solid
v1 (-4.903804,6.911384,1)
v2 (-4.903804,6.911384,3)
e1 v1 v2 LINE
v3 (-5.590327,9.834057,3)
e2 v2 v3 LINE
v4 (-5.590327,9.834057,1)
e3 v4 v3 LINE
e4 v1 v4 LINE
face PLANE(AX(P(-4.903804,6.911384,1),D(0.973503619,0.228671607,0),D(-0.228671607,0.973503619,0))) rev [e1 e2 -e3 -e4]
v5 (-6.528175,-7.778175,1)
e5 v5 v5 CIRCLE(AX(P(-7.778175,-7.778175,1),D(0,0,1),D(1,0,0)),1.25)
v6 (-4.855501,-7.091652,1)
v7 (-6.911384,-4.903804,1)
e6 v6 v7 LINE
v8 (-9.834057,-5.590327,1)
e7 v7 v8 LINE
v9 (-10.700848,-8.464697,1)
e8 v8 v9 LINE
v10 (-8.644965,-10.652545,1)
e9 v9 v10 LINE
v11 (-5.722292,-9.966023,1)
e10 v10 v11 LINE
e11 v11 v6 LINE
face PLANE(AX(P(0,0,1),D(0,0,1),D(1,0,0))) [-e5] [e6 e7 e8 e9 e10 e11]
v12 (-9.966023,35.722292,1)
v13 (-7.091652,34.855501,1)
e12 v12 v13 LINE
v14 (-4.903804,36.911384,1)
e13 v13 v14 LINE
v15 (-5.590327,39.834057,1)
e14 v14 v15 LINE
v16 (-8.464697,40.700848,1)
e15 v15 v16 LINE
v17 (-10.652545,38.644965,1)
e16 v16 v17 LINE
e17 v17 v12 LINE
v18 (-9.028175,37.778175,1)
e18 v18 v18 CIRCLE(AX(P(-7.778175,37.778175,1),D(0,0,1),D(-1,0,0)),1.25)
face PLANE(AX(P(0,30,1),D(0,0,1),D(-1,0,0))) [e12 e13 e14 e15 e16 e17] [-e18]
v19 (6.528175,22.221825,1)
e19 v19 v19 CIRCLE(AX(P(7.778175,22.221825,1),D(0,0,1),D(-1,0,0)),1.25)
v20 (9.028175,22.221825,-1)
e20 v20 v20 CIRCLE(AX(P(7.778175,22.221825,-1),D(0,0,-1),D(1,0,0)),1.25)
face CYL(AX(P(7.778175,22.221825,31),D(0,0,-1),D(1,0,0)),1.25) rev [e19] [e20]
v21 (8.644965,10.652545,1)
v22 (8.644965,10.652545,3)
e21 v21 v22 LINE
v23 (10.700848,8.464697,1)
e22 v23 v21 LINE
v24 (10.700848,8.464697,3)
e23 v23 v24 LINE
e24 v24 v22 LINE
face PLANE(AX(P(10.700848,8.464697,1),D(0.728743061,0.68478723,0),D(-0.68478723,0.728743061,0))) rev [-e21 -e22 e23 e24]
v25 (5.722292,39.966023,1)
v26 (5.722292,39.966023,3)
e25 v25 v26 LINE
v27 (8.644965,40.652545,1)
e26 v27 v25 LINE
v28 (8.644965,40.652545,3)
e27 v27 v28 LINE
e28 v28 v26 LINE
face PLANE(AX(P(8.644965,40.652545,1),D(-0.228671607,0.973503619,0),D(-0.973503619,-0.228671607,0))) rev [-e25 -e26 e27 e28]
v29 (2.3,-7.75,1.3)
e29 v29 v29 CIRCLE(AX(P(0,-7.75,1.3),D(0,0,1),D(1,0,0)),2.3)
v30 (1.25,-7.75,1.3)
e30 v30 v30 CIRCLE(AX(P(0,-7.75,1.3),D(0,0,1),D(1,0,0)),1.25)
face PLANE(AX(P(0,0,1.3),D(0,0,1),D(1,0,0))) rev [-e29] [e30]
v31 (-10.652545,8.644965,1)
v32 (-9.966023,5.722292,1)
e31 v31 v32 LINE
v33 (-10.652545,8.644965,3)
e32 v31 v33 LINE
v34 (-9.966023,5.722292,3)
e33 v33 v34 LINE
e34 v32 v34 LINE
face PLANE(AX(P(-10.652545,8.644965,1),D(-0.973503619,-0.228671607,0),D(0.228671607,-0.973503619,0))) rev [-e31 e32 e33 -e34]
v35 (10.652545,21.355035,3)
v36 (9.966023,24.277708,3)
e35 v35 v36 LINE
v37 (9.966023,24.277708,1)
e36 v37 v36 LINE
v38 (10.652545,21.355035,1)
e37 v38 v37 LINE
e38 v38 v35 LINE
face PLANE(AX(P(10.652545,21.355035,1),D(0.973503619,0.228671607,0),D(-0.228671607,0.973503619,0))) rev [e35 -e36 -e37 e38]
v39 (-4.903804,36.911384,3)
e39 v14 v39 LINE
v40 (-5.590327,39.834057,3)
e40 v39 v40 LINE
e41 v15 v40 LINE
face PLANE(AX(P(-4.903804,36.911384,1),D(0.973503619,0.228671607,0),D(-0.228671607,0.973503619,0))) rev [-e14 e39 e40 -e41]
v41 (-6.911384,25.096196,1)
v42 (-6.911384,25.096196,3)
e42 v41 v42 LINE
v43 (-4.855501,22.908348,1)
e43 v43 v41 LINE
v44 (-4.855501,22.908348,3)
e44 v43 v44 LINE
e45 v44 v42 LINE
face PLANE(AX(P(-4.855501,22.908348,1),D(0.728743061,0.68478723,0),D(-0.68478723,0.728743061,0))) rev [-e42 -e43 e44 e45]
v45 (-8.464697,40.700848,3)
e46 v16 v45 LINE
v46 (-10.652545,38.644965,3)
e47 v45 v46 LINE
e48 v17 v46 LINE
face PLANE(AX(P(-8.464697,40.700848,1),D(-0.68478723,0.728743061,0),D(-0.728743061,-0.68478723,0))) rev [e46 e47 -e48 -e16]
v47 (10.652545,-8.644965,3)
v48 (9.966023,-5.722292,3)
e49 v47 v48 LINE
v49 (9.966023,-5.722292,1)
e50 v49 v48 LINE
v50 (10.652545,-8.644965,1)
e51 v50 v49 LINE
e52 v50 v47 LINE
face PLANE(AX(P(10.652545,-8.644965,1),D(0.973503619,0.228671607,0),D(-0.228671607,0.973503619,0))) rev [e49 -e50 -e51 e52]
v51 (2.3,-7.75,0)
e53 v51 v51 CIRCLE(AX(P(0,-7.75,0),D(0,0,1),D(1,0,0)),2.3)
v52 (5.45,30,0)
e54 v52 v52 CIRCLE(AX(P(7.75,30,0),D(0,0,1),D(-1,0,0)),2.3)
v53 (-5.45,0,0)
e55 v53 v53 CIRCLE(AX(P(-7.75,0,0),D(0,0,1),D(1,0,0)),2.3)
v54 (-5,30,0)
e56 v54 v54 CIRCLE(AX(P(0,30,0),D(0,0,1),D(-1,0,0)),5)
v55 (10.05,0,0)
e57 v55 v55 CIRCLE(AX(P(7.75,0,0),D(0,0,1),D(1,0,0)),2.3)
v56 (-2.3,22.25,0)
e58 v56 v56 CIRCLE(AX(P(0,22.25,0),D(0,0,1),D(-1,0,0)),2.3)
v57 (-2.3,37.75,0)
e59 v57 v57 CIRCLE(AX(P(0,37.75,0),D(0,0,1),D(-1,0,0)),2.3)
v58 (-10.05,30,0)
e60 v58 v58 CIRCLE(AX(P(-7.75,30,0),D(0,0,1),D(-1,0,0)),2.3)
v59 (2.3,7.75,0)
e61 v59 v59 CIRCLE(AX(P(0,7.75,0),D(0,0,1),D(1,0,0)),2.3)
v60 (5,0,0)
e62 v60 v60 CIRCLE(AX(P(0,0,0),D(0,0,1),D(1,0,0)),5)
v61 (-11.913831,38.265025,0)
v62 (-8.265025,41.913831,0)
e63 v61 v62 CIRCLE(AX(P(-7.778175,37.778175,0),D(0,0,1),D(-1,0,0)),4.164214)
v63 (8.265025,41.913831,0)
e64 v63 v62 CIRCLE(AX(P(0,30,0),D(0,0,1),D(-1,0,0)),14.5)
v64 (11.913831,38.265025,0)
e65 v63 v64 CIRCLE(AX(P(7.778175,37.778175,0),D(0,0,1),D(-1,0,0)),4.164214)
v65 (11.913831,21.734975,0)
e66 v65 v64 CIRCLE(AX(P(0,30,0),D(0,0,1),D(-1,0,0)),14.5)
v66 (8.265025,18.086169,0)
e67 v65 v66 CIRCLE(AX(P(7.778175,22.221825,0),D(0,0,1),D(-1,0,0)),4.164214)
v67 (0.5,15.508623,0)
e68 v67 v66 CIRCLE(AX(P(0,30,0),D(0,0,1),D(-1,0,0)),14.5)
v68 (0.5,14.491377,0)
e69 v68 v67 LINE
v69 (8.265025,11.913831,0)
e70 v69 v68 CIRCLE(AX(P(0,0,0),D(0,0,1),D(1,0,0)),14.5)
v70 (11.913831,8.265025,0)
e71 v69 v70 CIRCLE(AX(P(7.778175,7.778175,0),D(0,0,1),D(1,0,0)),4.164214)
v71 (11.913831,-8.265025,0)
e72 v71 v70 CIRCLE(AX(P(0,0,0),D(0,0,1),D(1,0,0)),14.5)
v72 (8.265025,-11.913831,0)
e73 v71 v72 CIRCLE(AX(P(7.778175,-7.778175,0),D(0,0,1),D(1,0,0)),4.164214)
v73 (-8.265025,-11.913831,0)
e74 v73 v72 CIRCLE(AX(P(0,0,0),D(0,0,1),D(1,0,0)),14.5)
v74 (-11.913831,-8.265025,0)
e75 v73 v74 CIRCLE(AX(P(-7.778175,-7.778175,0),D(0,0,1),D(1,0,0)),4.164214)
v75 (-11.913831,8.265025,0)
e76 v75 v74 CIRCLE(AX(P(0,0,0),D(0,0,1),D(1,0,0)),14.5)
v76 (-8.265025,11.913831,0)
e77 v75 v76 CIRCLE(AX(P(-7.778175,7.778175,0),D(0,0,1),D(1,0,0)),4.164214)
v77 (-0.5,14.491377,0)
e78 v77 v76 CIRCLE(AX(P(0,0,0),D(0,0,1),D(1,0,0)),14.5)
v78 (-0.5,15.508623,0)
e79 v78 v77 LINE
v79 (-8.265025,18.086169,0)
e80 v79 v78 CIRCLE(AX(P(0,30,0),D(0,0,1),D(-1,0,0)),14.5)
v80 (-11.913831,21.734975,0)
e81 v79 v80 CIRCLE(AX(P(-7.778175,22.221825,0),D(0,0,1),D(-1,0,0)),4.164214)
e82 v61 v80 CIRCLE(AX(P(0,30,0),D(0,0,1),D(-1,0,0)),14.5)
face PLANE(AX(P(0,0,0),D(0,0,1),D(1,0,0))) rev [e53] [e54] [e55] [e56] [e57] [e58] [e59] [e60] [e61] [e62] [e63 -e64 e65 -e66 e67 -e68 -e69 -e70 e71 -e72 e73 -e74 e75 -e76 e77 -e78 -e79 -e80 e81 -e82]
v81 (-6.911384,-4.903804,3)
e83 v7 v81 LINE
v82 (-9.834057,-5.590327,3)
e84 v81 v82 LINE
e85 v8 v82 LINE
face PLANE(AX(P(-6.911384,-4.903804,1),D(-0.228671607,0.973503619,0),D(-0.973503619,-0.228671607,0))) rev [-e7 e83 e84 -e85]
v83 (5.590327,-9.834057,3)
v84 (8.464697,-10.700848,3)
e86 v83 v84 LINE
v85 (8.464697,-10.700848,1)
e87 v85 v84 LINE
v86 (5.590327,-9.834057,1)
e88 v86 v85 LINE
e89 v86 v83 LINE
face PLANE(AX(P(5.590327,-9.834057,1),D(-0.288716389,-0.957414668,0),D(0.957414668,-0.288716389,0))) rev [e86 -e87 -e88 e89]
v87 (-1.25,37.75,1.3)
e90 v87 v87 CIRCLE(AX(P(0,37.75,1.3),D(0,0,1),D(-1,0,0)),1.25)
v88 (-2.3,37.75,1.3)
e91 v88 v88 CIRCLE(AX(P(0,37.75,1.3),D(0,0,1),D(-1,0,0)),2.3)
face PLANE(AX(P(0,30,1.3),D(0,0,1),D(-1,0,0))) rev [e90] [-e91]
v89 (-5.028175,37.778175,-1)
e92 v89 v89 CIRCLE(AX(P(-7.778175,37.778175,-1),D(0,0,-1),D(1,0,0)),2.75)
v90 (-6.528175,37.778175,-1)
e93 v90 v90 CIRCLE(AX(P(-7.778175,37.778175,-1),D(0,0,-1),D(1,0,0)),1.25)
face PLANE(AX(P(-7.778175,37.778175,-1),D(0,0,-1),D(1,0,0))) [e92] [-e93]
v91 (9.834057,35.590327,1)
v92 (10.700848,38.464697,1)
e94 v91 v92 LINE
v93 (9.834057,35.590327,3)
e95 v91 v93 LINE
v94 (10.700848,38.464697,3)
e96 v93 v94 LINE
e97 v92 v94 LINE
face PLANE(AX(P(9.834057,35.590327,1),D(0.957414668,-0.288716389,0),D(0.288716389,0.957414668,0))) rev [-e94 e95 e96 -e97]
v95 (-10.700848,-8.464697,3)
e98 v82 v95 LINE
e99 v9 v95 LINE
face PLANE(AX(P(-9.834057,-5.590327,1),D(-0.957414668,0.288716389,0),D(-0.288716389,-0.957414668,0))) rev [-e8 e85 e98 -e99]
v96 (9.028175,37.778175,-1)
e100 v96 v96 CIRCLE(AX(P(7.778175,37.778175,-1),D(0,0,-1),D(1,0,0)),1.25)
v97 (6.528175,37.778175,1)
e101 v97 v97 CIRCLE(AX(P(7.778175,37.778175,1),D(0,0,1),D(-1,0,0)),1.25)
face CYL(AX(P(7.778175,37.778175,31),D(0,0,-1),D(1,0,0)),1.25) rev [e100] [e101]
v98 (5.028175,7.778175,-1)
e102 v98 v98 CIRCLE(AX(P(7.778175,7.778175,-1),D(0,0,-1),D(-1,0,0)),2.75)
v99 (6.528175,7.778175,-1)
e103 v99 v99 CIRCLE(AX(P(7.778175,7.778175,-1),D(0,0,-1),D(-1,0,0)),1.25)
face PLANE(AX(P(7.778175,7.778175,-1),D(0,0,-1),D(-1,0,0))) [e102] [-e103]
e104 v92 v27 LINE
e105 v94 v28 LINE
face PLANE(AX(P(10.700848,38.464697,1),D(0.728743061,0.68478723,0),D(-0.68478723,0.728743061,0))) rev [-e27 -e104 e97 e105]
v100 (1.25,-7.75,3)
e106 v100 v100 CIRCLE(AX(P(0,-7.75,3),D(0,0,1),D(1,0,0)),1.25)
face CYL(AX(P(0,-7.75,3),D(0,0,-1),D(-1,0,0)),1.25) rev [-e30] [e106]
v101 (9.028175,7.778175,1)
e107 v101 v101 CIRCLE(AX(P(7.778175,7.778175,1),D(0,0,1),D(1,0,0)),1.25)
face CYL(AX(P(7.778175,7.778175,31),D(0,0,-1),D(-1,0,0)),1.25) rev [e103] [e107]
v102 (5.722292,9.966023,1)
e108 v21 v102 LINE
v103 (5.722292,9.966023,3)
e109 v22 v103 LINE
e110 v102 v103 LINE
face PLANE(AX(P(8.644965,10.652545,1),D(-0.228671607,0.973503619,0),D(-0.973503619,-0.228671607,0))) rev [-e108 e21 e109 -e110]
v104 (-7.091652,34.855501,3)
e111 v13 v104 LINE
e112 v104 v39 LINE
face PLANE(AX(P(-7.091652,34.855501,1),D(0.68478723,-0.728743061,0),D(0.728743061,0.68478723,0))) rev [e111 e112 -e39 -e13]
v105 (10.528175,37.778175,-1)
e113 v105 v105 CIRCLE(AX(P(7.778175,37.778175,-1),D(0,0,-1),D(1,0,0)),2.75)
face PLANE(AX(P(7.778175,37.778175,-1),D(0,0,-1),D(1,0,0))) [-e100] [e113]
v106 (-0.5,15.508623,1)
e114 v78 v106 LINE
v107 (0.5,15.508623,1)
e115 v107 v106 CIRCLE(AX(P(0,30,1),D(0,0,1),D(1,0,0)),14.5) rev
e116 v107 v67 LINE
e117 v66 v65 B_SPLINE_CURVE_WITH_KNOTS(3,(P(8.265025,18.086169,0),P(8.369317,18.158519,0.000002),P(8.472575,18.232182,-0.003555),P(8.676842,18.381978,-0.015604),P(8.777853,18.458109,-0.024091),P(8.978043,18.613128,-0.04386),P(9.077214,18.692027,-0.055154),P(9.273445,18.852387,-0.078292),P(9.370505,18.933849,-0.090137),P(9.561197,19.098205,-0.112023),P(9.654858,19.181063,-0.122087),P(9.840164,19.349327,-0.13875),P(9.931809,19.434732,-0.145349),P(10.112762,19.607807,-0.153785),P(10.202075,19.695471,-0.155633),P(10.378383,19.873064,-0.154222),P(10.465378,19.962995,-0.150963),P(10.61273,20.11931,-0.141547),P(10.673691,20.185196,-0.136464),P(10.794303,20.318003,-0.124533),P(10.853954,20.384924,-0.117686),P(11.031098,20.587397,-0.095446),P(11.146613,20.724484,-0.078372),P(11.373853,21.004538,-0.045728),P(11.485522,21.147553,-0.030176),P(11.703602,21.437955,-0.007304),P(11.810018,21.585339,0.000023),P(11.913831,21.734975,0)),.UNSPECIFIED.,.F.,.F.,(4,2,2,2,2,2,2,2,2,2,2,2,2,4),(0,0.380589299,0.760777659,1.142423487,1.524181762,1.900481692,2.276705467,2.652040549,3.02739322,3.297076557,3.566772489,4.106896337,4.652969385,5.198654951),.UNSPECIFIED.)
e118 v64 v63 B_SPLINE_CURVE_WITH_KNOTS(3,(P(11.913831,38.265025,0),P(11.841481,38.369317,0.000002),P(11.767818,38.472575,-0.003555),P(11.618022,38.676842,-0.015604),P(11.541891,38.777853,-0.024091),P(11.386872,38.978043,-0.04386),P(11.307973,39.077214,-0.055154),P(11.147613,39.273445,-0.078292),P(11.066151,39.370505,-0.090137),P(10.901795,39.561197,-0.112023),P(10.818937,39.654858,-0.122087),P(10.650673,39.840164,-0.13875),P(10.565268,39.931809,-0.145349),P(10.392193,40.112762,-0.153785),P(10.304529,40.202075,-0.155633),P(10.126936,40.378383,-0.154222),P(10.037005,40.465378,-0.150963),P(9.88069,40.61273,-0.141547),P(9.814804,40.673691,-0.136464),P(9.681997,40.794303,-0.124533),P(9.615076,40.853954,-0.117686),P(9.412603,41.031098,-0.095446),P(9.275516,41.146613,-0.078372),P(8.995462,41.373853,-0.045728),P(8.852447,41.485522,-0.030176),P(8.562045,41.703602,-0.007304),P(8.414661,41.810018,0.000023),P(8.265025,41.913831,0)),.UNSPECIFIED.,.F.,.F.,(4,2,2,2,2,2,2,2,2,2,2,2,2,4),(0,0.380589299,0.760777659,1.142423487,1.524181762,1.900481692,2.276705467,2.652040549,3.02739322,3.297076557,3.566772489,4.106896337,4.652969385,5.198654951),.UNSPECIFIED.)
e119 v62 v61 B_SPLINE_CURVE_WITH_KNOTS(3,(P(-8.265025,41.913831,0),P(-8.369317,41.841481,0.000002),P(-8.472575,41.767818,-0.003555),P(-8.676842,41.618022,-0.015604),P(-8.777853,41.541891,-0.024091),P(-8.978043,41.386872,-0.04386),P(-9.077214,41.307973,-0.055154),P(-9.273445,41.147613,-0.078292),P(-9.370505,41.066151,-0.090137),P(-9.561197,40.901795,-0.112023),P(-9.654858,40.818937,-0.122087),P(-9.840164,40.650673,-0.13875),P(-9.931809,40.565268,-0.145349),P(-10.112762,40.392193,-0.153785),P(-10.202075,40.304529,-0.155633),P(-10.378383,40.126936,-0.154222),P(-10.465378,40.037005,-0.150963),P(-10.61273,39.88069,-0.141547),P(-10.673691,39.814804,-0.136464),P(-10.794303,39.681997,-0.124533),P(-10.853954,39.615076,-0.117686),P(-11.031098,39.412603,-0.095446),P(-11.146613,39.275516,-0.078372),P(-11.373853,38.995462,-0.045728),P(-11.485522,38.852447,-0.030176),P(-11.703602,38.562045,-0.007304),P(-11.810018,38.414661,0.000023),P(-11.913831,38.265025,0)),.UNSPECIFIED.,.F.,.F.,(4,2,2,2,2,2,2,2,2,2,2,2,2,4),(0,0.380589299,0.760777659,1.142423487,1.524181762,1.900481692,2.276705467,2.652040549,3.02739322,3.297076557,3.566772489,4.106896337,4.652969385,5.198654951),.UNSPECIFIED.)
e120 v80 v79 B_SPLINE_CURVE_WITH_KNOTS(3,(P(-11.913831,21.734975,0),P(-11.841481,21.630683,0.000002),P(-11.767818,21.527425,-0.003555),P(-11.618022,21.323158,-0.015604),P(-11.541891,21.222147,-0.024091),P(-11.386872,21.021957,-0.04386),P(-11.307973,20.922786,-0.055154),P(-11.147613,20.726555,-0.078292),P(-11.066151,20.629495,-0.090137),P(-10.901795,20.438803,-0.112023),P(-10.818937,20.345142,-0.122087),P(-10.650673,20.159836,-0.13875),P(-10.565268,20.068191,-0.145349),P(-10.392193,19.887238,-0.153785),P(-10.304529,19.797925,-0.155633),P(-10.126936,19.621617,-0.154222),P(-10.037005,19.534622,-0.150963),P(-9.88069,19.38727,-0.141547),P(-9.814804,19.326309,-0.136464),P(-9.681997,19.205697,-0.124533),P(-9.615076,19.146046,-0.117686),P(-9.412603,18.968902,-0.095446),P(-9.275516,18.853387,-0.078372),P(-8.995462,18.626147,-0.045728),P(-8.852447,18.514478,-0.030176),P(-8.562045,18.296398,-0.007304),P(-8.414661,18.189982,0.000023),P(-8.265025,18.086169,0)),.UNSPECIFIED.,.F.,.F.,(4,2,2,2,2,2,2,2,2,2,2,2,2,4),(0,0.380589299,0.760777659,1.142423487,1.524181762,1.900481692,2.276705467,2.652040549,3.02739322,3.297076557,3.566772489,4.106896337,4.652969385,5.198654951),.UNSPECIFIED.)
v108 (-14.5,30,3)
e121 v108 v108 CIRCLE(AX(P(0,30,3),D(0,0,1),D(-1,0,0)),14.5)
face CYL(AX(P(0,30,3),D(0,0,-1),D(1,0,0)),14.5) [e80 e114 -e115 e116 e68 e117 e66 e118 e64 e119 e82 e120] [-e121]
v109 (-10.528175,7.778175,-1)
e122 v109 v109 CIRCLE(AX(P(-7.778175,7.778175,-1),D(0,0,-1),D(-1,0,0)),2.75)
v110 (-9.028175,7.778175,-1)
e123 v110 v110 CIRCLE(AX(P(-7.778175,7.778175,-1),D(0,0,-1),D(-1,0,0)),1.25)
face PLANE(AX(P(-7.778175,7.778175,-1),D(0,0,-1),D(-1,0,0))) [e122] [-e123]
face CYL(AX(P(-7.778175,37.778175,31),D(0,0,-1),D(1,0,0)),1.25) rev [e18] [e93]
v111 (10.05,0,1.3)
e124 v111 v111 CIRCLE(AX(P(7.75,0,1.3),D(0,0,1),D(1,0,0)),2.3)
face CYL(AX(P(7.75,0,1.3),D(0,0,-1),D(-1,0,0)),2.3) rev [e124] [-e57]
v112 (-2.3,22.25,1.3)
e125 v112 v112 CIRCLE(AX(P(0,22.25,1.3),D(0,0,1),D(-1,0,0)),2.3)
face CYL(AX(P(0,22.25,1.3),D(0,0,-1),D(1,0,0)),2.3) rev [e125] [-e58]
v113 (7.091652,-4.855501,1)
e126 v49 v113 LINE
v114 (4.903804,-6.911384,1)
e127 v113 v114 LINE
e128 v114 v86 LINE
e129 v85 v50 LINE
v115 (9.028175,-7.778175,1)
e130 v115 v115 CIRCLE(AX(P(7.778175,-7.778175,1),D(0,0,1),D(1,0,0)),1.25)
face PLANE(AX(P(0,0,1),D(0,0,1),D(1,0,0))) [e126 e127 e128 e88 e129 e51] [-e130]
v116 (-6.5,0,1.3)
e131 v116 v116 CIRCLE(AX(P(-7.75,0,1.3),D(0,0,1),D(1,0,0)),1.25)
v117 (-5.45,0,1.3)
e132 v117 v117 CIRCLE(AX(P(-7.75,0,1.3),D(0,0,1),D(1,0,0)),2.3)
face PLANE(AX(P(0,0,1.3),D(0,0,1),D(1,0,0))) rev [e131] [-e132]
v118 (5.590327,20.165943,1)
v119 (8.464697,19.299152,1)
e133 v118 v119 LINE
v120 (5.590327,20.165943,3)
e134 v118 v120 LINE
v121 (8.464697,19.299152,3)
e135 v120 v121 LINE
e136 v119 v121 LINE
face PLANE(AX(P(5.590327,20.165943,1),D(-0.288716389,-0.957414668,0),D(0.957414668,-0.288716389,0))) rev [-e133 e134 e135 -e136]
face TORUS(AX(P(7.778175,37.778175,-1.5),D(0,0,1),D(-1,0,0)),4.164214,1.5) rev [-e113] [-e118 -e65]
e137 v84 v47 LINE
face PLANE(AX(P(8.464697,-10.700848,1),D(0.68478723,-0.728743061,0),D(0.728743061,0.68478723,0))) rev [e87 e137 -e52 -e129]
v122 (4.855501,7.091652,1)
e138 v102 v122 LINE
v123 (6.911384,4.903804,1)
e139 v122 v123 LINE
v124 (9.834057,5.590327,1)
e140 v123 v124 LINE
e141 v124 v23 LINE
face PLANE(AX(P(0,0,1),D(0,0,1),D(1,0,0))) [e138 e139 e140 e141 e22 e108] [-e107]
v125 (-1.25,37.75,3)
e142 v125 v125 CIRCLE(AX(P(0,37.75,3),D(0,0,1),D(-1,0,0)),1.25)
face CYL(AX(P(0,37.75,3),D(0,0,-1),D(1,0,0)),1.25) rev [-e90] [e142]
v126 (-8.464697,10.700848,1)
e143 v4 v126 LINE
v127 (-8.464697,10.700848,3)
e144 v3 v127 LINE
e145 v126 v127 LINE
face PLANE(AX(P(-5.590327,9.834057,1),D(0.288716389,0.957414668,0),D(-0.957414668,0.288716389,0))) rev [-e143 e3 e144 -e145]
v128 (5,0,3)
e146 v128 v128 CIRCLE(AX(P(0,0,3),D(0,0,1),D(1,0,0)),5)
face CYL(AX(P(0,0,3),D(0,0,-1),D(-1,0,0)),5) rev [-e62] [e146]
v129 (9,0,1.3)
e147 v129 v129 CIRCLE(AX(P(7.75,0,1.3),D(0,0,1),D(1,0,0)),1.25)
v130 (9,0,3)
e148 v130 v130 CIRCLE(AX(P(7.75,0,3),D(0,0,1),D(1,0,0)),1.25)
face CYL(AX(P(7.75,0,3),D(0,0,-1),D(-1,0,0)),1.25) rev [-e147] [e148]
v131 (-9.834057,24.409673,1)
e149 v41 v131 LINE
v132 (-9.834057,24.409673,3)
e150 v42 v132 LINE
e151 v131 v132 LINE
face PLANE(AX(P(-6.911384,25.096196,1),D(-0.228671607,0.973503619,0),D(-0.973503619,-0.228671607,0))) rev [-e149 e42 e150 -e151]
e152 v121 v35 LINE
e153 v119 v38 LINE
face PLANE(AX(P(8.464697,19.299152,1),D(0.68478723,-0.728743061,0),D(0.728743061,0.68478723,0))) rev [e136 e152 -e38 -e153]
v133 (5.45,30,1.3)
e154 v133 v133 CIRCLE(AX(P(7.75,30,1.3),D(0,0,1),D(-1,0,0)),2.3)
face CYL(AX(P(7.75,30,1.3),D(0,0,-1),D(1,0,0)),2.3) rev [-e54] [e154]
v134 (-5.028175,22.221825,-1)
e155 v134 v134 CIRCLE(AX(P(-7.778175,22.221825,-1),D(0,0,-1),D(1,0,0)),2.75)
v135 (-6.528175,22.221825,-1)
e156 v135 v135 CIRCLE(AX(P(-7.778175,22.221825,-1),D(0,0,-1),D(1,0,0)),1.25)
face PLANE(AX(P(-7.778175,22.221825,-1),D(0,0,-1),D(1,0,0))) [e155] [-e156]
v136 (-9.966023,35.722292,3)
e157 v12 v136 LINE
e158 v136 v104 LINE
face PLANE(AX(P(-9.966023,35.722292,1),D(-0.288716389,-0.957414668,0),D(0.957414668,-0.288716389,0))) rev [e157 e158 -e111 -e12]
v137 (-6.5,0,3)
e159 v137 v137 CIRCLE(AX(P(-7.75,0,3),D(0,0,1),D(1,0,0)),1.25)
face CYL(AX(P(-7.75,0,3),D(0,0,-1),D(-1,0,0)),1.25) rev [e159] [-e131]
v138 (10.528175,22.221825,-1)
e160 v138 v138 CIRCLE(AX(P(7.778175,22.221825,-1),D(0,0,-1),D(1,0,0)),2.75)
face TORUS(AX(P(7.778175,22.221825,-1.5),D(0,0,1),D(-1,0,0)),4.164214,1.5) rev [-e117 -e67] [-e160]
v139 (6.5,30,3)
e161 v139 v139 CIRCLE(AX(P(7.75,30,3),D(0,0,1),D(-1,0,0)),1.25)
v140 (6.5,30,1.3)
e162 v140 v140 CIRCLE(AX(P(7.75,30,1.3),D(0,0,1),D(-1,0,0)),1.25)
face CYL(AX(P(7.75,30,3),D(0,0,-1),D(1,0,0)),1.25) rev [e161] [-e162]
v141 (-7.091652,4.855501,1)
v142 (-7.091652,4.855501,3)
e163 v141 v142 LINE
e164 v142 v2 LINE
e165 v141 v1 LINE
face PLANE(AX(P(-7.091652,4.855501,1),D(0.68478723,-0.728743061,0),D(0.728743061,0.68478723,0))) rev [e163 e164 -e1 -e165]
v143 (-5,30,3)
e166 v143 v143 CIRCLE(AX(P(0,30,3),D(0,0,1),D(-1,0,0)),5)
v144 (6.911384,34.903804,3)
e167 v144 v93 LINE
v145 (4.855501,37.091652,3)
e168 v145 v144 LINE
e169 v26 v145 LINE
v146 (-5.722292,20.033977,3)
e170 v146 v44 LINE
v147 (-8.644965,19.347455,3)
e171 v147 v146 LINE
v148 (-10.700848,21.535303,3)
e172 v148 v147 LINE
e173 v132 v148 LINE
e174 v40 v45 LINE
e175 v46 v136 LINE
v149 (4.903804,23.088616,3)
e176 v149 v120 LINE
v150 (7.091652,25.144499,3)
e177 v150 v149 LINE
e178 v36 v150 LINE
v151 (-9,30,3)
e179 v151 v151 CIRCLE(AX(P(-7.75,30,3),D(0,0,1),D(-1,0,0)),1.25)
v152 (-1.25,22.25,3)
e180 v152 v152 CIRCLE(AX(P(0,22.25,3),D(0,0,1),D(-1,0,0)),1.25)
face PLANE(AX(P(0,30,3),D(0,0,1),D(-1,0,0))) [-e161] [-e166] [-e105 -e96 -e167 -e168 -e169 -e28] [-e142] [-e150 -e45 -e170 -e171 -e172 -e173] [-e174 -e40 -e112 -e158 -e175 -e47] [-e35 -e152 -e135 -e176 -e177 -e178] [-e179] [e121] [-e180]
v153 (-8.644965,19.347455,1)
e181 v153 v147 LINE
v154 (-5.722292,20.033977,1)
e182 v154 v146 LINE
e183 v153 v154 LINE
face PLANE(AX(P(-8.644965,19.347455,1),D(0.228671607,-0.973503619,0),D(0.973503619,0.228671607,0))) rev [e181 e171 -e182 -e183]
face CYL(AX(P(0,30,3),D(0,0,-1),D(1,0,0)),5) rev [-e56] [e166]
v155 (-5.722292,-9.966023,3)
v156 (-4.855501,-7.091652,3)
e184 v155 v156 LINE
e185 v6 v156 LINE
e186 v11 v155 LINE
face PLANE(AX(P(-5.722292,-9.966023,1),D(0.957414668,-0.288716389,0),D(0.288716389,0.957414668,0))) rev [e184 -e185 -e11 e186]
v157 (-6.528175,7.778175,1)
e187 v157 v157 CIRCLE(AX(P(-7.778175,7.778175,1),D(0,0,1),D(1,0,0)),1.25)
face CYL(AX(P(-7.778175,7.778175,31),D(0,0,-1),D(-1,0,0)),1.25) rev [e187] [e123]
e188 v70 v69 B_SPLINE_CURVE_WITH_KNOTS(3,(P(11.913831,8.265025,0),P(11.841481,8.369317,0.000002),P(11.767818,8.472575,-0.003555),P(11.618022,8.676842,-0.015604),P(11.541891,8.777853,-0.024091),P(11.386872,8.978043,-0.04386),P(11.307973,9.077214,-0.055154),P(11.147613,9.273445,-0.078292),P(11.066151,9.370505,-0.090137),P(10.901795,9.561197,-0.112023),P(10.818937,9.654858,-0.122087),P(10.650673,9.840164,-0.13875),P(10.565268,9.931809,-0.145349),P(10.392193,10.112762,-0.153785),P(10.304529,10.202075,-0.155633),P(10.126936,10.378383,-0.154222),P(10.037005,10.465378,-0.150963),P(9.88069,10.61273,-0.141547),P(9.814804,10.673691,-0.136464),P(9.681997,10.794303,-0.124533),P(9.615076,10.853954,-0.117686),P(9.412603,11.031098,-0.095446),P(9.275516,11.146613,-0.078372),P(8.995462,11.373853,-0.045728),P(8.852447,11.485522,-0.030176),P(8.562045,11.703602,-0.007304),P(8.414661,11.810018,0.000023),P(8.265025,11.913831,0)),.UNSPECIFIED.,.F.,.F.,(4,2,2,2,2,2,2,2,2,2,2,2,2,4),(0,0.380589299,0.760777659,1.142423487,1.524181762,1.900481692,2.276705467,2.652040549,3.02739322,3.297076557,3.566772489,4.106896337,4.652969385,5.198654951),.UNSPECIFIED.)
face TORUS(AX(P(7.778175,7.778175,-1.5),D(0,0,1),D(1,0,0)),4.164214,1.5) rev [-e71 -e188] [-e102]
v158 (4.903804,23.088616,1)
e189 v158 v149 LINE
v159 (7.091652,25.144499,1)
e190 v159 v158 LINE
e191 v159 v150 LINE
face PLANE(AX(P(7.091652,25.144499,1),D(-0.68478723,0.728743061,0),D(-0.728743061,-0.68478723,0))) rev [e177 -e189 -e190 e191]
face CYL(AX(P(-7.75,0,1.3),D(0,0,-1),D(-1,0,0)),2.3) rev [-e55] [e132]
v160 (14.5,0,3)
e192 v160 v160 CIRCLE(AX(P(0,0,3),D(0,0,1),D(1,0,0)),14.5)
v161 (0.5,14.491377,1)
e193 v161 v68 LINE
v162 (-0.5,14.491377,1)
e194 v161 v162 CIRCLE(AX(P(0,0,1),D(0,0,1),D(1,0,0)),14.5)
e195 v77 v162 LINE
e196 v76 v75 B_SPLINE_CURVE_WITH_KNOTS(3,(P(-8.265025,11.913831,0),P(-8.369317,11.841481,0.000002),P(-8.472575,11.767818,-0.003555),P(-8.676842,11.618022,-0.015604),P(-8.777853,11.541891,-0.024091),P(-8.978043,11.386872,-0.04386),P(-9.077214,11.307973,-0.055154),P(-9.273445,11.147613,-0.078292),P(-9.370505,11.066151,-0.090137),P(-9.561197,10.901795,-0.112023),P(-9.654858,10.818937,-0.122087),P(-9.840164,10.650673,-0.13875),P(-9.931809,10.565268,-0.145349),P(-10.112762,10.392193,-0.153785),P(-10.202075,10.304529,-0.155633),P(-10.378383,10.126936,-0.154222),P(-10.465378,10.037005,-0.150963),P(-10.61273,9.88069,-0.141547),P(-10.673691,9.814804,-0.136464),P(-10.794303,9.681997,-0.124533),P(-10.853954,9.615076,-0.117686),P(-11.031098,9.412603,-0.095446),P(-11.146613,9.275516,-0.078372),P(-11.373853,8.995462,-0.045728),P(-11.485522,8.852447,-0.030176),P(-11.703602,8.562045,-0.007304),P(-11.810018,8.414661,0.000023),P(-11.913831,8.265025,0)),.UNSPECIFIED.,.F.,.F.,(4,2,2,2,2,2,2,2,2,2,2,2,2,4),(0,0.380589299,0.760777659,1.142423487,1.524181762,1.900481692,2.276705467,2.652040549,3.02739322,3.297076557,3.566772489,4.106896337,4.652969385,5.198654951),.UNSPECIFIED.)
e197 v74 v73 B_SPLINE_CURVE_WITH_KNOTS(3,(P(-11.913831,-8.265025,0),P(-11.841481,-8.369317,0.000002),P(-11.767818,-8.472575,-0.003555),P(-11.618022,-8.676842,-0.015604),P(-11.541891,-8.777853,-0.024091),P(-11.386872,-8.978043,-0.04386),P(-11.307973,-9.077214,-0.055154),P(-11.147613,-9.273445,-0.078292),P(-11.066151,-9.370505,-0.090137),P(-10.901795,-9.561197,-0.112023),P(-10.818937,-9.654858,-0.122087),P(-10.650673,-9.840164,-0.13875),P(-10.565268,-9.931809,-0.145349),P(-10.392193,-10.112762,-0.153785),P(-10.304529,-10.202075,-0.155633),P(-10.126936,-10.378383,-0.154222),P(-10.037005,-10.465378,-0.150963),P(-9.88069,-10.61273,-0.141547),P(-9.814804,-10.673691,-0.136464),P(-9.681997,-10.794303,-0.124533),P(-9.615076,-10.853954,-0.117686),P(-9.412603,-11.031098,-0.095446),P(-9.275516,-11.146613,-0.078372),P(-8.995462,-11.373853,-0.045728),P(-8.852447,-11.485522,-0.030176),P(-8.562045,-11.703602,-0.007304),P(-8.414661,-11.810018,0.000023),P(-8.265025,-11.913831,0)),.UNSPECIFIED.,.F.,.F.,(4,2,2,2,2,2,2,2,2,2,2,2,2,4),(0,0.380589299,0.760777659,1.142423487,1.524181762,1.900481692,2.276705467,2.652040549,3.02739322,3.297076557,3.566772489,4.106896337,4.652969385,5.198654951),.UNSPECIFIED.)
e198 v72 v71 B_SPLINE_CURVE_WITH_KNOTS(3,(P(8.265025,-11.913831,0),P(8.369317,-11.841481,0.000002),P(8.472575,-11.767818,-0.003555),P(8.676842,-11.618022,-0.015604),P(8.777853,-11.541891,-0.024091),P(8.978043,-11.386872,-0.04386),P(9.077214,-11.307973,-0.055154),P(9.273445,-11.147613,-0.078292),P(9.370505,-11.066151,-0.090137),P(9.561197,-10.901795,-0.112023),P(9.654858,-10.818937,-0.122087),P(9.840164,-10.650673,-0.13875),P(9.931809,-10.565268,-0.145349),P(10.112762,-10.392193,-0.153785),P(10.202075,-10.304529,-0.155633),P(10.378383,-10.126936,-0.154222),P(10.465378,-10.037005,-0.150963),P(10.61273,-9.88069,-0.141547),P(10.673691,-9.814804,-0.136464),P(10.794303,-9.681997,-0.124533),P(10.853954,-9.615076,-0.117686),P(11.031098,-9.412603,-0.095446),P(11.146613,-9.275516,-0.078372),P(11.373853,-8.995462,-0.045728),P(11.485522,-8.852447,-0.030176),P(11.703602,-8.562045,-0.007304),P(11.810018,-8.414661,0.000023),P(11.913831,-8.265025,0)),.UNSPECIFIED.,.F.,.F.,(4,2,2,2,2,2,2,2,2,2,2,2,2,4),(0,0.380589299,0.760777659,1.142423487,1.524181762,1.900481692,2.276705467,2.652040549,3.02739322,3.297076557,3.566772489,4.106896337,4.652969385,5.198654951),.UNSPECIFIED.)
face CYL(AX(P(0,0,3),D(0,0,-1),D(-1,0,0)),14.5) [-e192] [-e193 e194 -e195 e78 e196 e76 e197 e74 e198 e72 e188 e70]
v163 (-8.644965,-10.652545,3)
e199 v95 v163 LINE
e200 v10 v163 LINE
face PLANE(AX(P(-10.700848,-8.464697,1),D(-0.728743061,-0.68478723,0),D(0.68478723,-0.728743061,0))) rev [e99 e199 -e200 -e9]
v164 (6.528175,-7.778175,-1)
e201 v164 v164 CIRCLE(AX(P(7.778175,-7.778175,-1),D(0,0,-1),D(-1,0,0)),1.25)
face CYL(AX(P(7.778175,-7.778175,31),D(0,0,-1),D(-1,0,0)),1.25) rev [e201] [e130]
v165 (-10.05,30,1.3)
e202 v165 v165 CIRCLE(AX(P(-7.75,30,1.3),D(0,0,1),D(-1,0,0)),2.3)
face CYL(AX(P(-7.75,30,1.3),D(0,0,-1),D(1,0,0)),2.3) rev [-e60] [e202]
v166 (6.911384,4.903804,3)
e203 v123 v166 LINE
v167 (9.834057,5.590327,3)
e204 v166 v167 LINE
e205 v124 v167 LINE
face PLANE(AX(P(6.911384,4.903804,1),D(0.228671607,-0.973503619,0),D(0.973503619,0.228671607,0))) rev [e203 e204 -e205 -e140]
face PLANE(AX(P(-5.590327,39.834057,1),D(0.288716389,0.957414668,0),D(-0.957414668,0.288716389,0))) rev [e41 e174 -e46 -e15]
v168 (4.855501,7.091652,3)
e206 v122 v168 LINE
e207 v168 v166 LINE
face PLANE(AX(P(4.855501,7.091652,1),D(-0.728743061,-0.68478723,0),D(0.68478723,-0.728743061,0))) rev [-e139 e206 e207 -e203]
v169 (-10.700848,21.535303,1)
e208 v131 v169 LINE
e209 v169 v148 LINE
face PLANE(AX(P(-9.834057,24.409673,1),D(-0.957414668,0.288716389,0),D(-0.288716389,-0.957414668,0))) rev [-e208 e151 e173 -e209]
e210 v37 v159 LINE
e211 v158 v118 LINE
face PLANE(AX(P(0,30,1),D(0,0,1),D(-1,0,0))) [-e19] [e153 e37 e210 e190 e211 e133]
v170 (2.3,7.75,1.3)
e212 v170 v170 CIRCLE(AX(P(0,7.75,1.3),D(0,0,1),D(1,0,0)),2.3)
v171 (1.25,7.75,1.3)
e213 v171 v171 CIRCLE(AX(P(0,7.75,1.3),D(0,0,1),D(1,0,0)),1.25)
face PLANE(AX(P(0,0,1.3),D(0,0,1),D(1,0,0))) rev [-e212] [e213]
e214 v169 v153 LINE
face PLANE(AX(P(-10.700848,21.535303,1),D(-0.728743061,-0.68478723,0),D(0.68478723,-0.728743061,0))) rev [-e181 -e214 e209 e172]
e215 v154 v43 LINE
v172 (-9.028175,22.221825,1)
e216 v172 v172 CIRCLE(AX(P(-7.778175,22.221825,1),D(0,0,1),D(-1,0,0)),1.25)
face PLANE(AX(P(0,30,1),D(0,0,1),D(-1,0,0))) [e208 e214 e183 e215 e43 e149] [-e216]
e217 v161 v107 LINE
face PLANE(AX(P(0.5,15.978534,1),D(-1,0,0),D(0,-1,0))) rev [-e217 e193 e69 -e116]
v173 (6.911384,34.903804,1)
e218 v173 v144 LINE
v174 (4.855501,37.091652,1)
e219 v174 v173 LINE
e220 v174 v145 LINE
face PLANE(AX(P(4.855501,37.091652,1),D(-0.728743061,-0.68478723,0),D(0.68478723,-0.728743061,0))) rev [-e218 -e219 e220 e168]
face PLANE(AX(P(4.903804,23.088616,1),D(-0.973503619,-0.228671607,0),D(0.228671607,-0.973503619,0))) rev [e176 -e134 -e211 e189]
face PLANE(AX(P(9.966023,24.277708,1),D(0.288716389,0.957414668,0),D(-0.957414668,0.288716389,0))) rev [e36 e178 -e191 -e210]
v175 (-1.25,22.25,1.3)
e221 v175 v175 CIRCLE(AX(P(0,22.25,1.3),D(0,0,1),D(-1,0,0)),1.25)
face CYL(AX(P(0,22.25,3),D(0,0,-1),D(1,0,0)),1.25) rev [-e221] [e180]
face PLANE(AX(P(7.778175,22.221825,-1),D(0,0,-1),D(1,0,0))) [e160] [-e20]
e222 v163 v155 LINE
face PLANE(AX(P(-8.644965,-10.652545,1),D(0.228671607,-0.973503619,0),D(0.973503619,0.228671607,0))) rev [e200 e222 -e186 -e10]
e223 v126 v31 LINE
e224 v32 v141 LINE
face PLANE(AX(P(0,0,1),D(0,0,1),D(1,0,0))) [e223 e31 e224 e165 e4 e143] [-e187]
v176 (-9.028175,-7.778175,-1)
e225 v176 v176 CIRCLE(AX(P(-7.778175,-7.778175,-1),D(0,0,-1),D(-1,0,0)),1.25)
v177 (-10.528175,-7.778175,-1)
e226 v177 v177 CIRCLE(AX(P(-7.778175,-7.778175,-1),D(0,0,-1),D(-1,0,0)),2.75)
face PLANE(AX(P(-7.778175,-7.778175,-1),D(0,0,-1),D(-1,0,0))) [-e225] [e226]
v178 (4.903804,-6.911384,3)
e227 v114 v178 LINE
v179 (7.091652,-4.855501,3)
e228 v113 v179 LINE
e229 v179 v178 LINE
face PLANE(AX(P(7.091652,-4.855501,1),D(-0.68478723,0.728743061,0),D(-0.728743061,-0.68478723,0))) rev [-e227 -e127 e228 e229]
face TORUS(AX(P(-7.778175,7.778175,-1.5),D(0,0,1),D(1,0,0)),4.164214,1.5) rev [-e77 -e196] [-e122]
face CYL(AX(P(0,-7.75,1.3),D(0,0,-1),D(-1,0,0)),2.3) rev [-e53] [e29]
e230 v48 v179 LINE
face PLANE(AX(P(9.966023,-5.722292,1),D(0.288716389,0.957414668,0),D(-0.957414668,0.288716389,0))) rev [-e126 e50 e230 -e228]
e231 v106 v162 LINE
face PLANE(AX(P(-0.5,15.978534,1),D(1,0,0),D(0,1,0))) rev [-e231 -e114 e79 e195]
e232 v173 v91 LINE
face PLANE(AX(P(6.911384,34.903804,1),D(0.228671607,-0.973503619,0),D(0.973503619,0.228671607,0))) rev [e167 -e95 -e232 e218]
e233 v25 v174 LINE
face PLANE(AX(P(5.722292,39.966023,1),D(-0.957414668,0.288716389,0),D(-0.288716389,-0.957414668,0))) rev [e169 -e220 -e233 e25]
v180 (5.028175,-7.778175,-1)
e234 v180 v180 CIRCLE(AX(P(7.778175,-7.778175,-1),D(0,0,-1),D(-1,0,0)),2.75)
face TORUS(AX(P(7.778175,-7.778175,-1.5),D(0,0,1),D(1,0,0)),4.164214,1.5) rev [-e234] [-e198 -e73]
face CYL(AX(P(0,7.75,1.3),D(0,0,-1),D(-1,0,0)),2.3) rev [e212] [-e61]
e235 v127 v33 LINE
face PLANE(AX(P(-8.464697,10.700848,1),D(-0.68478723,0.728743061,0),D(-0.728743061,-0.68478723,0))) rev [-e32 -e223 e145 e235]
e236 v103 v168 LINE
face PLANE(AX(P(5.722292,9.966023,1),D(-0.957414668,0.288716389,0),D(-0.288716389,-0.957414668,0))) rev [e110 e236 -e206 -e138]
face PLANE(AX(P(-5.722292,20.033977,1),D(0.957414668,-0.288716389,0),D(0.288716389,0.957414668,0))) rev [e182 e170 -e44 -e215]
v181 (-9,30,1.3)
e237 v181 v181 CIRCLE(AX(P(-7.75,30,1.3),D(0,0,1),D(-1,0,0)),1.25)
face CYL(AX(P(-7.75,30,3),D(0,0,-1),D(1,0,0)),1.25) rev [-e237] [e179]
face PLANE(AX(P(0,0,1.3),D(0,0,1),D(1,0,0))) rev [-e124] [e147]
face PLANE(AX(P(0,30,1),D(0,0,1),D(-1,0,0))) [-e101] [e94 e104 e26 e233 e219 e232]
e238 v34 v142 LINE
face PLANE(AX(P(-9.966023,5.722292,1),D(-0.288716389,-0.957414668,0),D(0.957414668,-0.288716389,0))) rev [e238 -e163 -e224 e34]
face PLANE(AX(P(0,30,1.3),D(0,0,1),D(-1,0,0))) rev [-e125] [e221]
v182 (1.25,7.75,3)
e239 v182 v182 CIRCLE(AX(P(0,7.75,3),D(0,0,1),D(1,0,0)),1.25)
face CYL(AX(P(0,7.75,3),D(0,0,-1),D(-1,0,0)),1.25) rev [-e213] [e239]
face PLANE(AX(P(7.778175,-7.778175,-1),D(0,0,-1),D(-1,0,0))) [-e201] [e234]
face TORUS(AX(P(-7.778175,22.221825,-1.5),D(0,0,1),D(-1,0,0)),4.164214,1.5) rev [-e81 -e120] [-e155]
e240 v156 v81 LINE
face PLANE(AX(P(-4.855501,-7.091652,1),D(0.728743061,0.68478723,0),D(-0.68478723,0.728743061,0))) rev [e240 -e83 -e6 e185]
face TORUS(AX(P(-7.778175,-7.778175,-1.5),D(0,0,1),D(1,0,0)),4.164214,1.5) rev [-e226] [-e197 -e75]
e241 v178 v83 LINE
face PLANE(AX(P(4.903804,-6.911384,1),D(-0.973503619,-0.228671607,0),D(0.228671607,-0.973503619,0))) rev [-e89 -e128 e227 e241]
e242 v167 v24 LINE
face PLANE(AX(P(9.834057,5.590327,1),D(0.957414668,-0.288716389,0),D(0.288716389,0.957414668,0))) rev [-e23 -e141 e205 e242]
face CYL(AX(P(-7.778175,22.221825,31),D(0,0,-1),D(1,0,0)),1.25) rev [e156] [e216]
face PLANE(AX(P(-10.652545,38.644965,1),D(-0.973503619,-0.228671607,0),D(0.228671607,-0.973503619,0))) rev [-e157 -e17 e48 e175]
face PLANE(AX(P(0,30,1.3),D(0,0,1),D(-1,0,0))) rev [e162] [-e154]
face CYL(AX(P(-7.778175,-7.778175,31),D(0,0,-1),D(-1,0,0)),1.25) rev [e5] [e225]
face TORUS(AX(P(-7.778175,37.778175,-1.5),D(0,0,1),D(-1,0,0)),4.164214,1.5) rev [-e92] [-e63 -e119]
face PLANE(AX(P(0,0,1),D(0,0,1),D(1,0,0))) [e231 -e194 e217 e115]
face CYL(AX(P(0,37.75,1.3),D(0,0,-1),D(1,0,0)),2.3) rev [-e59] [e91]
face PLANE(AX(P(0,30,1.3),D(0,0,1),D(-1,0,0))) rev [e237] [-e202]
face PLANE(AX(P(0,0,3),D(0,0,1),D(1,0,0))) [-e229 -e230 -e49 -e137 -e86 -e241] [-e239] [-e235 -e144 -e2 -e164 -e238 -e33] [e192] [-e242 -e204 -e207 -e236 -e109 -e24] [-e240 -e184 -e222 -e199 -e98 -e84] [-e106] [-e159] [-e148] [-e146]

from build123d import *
from build123d.topology import SkipClean

# Parameters (mm, degrees)
SKETCH_1_R               = 14.5
SKETCH_1_R_2             = 1.25
SKETCH_1_R_3             = 5
EXTRUDE_5_DEPTH          = 3
SKETCH_1_6_R             = 5
SKETCH_1_6_R_2           = 2.3
SKETCH_1_6_R_3           = 1.25
CUT_EXTRUDE_1_DEPTH      = 1.3
SKETCH_2_R               = 1.25
CUT_EXTRUDE_2_DEPTH      = 31
EXTRUDE_START            = 1
SKETCH_3_R               = 2.75
SKETCH_3_R_2             = 1.25
EXTRUDE_6_DEPTH          = 1
FILLET_1_R               = 1.5
CUT_EXTRUDE_3_DEPTH      = 2
PATTERN_CIRCULAR_2_COUNT = 2
SKETCH_7_W               = 1
SKETCH_7_H               = 1.957068822
EXTRUDE_7_DEPTH          = 1


with BuildPart() as part:
    # 草图1 → 凸台-拉伸5 (new body)
    with BuildSketch(Plane.XY):
        Circle(SKETCH_1_R)
        with Locations((0, 7.75)):
            Circle(SKETCH_1_R_2, mode=Mode.SUBTRACT)
        with Locations((7.75, 0)):
            Circle(SKETCH_1_R_2, mode=Mode.SUBTRACT)
        with Locations((0, -7.75)):
            Circle(SKETCH_1_R_2, mode=Mode.SUBTRACT)
        with Locations((-7.75, 0)):
            Circle(SKETCH_1_R_2, mode=Mode.SUBTRACT)
        Circle(SKETCH_1_R_3, mode=Mode.SUBTRACT)
    extrude(amount=EXTRUDE_5_DEPTH)

    # 草图1<6> → 切除-拉伸1 (cut)
    # profile 1 of 8: a face of its own
    with BuildSketch(Plane.XY):
        Circle(SKETCH_1_6_R)
    # profile 2 of 8: a face of its own
    with BuildSketch(Plane.XY):
        with Locations((7.75, 0)):
            Circle(SKETCH_1_6_R_2)
        with Locations((7.75, 0)):
            Circle(SKETCH_1_6_R_3, mode=Mode.SUBTRACT)
    # profile 3 of 8: a face of its own
    with BuildSketch(Plane.XY):
        Circle(SKETCH_1_6_R)
    # profile 4 of 8: a face of its own
    with BuildSketch(Plane.XY):
        with Locations((0, 7.75)):
            Circle(SKETCH_1_6_R_2)
        with Locations((0, 7.75)):
            Circle(SKETCH_1_6_R_3, mode=Mode.SUBTRACT)
    # profile 5 of 8: a face of its own
    with BuildSketch(Plane.XY):
        Circle(SKETCH_1_6_R)
    # profile 6 of 8: a face of its own
    with BuildSketch(Plane.XY):
        with Locations((-7.75, 0)):
            Circle(SKETCH_1_6_R_2)
        with Locations((-7.75, 0)):
            Circle(SKETCH_1_6_R_3, mode=Mode.SUBTRACT)
    # profile 7 of 8: a face of its own
    with BuildSketch(Plane.XY):
        Circle(SKETCH_1_6_R)
    # profile 8 of 8: a face of its own
    with BuildSketch(Plane.XY):
        with Locations((0, -7.75)):
            Circle(SKETCH_1_6_R_2)
        with Locations((0, -7.75)):
            Circle(SKETCH_1_6_R_3, mode=Mode.SUBTRACT)
    extrude(amount=CUT_EXTRUDE_1_DEPTH, mode=Mode.SUBTRACT)

    # 草图2 → 切除-拉伸2 (cut)
    with BuildSketch(Plane.XY):
        with Locations((-7.778174593, 7.778174593)):
            Circle(SKETCH_2_R)
        with Locations((7.778174593, 7.778174593)):
            Circle(SKETCH_2_R)
        with Locations((7.778174593, -7.778174593)):
            Circle(SKETCH_2_R)
        with Locations((-7.778174593, -7.778174593)):
            Circle(SKETCH_2_R)
    extrude(amount=CUT_EXTRUDE_2_DEPTH, mode=Mode.SUBTRACT)

    # 草图3 → 凸台-拉伸6 (add)
    # profile 1 of 4: a face of its own
    with SkipClean():  # the faces are left unmerged after this step: merging them gives an invalid solid
        with BuildSketch(Plane(origin=(0, 0, 0), x_dir=(-1, 0, 0), z_dir=(0, 0, -1)).offset(EXTRUDE_START)):
            with Locations(Location((7.778174593, 7.778174593, 0), (0, 0, 180))):
                Circle(SKETCH_3_R)
            with Locations((7.778174593, 7.778174593)):
                Circle(SKETCH_3_R_2, mode=Mode.SUBTRACT)
        # profile 2 of 4: a face of its own
        with BuildSketch(Plane(origin=(0, 0, 0), x_dir=(-1, 0, 0), z_dir=(0, 0, -1)).offset(EXTRUDE_START)):
            with Locations(Location((7.778174593, -7.778174593, 0), (0, 0, 180))):
                Circle(SKETCH_3_R)
            with Locations((7.778174593, -7.778174593)):
                Circle(SKETCH_3_R_2, mode=Mode.SUBTRACT)
        # profile 3 of 4: a face of its own
        with BuildSketch(Plane(origin=(0, 0, 0), x_dir=(-1, 0, 0), z_dir=(0, 0, -1)).offset(EXTRUDE_START)):
            with Locations(Location((-7.778174593, -7.778174593, 0), (0, 0, 180))):
                Circle(SKETCH_3_R)
            with Locations((-7.778174593, -7.778174593)):
                Circle(SKETCH_3_R_2, mode=Mode.SUBTRACT)
        # profile 4 of 4: a face of its own
        with BuildSketch(Plane(origin=(0, 0, 0), x_dir=(-1, 0, 0), z_dir=(0, 0, -1)).offset(EXTRUDE_START)):
            with Locations(Location((-7.778174593, 7.778174593, 0), (0, 0, 180))):
                Circle(SKETCH_3_R)
            with Locations((-7.778174593, 7.778174593)):
                Circle(SKETCH_3_R_2, mode=Mode.SUBTRACT)
        extrude(amount=-EXTRUDE_6_DEPTH)

    # 圆角1
    # the kernel refuses this fillet: 1.5 mm, written as the material it adds along each edge
    with BuildSketch(Plane(origin=(-7.778174593, 7.778174593, 0), x_dir=(1, 0, 0), z_dir=(0, 1, 0))) as fillet_1_piece_1_section:
        with BuildLine():
            CenterArc((4.164213562, 1.5), FILLET_1_R, 199.471220634, 70.528779366)
            Line((2.75, 1), (2.721715729, 0.99))
            ThreePointArc((2.721715729, 0.99), (2.72, 0.5), (2.72, 0))
            Line((2.72, 0), (2.75, -0.03))
            Line((2.75, -0.03), (4.164213562, -0.03))
            Line((4.164213562, -0.03), (4.164213562, 0))
        make_face()
    fillet_1_piece_1 = revolve(axis=Axis((-7.778174593, 7.778174593, 0), (0, 0, -1)), mode=Mode.PRIVATE)
    fillet_1_piece_1 = fillet_1_piece_1 & Plane(origin=(0, 0, -0.258469001), x_dir=(1, 0, 0), z_dir=(0, 0, -1)) * Cylinder(14.5, 17, mode=Mode.PRIVATE)
    add(fillet_1_piece_1)
    with BuildSketch(Plane(origin=(-7.778174593, -7.778174593, 0), x_dir=(1, 0, 0), z_dir=(0, 1, 0))) as fillet_1_piece_2_section:
        with BuildLine():
            CenterArc((4.164213562, 1.5), FILLET_1_R, 199.471220634, 70.528779366)
            Line((2.75, 1), (2.721715729, 0.99))
            ThreePointArc((2.721715729, 0.99), (2.72, 0.5), (2.72, 0))
            Line((2.72, 0), (2.75, -0.03))
            Line((2.75, -0.03), (4.164213562, -0.03))
            Line((4.164213562, -0.03), (4.164213562, 0))
        make_face()
    fillet_1_piece_2 = revolve(axis=Axis((-7.778174593, -7.778174593, 0), (0, 0, -1)), mode=Mode.PRIVATE)
    fillet_1_piece_2 = fillet_1_piece_2 & Plane(origin=(0, 0, -0.258469001), x_dir=(1, 0, 0), z_dir=(0, 0, -1)) * Cylinder(14.5, 17, mode=Mode.PRIVATE)
    add(fillet_1_piece_2)
    with BuildSketch(Plane(origin=(7.778174593, -7.778174593, 0), x_dir=(1, 0, 0), z_dir=(0, 1, 0))) as fillet_1_piece_3_section:
        with BuildLine():
            CenterArc((4.164213562, 1.5), FILLET_1_R, 199.471220634, 70.528779366)
            Line((2.75, 1), (2.721715729, 0.99))
            ThreePointArc((2.721715729, 0.99), (2.72, 0.5), (2.72, 0))
            Line((2.72, 0), (2.75, -0.03))
            Line((2.75, -0.03), (4.164213562, -0.03))
            Line((4.164213562, -0.03), (4.164213562, 0))
        make_face()
    fillet_1_piece_3 = revolve(axis=Axis((7.778174593, -7.778174593, 0), (0, 0, -1)), mode=Mode.PRIVATE)
    fillet_1_piece_3 = fillet_1_piece_3 & Plane(origin=(0, 0, -0.258469001), x_dir=(1, 0, 0), z_dir=(0, 0, -1)) * Cylinder(14.5, 17, mode=Mode.PRIVATE)
    add(fillet_1_piece_3)
    with BuildSketch(Plane(origin=(7.778174593, 7.778174593, 0), x_dir=(1, 0, 0), z_dir=(0, 1, 0))) as fillet_1_piece_4_section:
        with BuildLine():
            CenterArc((4.164213562, 1.5), FILLET_1_R, 199.471220634, 70.528779366)
            Line((2.75, 1), (2.721715729, 0.99))
            ThreePointArc((2.721715729, 0.99), (2.72, 0.5), (2.72, 0))
            Line((2.72, 0), (2.75, -0.03))
            Line((2.75, -0.03), (4.164213562, -0.03))
            Line((4.164213562, -0.03), (4.164213562, 0))
        make_face()
    fillet_1_piece_4 = revolve(axis=Axis((7.778174593, 7.778174593, 0), (0, 0, -1)), mode=Mode.PRIVATE)
    fillet_1_piece_4 = fillet_1_piece_4 & Plane(origin=(0, 0, -0.258469001), x_dir=(1, 0, 0), z_dir=(0, 0, -1)) * Cylinder(14.5, 17, mode=Mode.PRIVATE)
    add(fillet_1_piece_4)

    # 草图4 → 切除-拉伸3 (cut)
    with BuildSketch(Plane.XY.offset(3)):
        Polygon((6.911384071, 4.903803788), (9.834057469, 5.590326579), (10.700847991, 8.464697384), (8.644965115, 10.652545398), (5.722291717, 9.966022607), (4.855501195, 7.091651802), align=None)
        Polygon((-8.464697384, 10.700847991), (-10.652545398, 8.644965115), (-9.966022607, 5.722291717), (-7.091651802, 4.855501195), (-4.903803788, 6.911384071), (-5.590326579, 9.834057469), align=None)
        Polygon((4.903803788, -6.911384071), (5.590326579, -9.834057469), (8.464697384, -10.700847991), (10.652545398, -8.644965115), (9.966022607, -5.722291717), (7.091651802, -4.855501195), align=None)
        Polygon((-6.911384071, -4.903803788), (-9.834057469, -5.590326579), (-10.700847991, -8.464697384), (-8.644965115, -10.652545398), (-5.722291717, -9.966022607), (-4.855501195, -7.091651802), align=None)
    extrude(amount=-CUT_EXTRUDE_3_DEPTH, mode=Mode.SUBTRACT)


with BuildPart() as pattern_circular_2_1:
    # 阵列(圆周)2: pattern copy
    add(part.part.rotate(Axis((0, 15, 0), (0, 0, 1)), 1 * 360 / PATTERN_CIRCULAR_2_COUNT))


with BuildPart() as part_1:
    add(part.part)

    add(pattern_circular_2_1.part)  # 凸台-拉伸7 merges 阵列(圆周)2_1
    # 草图7 → 凸台-拉伸7 (add)
    with BuildSketch(Plane.XY):
        with Locations((0, 15)):
            Rectangle(SKETCH_7_W, SKETCH_7_H)
    extrude(amount=EXTRUDE_7_DEPTH)


solid = part_1.part
